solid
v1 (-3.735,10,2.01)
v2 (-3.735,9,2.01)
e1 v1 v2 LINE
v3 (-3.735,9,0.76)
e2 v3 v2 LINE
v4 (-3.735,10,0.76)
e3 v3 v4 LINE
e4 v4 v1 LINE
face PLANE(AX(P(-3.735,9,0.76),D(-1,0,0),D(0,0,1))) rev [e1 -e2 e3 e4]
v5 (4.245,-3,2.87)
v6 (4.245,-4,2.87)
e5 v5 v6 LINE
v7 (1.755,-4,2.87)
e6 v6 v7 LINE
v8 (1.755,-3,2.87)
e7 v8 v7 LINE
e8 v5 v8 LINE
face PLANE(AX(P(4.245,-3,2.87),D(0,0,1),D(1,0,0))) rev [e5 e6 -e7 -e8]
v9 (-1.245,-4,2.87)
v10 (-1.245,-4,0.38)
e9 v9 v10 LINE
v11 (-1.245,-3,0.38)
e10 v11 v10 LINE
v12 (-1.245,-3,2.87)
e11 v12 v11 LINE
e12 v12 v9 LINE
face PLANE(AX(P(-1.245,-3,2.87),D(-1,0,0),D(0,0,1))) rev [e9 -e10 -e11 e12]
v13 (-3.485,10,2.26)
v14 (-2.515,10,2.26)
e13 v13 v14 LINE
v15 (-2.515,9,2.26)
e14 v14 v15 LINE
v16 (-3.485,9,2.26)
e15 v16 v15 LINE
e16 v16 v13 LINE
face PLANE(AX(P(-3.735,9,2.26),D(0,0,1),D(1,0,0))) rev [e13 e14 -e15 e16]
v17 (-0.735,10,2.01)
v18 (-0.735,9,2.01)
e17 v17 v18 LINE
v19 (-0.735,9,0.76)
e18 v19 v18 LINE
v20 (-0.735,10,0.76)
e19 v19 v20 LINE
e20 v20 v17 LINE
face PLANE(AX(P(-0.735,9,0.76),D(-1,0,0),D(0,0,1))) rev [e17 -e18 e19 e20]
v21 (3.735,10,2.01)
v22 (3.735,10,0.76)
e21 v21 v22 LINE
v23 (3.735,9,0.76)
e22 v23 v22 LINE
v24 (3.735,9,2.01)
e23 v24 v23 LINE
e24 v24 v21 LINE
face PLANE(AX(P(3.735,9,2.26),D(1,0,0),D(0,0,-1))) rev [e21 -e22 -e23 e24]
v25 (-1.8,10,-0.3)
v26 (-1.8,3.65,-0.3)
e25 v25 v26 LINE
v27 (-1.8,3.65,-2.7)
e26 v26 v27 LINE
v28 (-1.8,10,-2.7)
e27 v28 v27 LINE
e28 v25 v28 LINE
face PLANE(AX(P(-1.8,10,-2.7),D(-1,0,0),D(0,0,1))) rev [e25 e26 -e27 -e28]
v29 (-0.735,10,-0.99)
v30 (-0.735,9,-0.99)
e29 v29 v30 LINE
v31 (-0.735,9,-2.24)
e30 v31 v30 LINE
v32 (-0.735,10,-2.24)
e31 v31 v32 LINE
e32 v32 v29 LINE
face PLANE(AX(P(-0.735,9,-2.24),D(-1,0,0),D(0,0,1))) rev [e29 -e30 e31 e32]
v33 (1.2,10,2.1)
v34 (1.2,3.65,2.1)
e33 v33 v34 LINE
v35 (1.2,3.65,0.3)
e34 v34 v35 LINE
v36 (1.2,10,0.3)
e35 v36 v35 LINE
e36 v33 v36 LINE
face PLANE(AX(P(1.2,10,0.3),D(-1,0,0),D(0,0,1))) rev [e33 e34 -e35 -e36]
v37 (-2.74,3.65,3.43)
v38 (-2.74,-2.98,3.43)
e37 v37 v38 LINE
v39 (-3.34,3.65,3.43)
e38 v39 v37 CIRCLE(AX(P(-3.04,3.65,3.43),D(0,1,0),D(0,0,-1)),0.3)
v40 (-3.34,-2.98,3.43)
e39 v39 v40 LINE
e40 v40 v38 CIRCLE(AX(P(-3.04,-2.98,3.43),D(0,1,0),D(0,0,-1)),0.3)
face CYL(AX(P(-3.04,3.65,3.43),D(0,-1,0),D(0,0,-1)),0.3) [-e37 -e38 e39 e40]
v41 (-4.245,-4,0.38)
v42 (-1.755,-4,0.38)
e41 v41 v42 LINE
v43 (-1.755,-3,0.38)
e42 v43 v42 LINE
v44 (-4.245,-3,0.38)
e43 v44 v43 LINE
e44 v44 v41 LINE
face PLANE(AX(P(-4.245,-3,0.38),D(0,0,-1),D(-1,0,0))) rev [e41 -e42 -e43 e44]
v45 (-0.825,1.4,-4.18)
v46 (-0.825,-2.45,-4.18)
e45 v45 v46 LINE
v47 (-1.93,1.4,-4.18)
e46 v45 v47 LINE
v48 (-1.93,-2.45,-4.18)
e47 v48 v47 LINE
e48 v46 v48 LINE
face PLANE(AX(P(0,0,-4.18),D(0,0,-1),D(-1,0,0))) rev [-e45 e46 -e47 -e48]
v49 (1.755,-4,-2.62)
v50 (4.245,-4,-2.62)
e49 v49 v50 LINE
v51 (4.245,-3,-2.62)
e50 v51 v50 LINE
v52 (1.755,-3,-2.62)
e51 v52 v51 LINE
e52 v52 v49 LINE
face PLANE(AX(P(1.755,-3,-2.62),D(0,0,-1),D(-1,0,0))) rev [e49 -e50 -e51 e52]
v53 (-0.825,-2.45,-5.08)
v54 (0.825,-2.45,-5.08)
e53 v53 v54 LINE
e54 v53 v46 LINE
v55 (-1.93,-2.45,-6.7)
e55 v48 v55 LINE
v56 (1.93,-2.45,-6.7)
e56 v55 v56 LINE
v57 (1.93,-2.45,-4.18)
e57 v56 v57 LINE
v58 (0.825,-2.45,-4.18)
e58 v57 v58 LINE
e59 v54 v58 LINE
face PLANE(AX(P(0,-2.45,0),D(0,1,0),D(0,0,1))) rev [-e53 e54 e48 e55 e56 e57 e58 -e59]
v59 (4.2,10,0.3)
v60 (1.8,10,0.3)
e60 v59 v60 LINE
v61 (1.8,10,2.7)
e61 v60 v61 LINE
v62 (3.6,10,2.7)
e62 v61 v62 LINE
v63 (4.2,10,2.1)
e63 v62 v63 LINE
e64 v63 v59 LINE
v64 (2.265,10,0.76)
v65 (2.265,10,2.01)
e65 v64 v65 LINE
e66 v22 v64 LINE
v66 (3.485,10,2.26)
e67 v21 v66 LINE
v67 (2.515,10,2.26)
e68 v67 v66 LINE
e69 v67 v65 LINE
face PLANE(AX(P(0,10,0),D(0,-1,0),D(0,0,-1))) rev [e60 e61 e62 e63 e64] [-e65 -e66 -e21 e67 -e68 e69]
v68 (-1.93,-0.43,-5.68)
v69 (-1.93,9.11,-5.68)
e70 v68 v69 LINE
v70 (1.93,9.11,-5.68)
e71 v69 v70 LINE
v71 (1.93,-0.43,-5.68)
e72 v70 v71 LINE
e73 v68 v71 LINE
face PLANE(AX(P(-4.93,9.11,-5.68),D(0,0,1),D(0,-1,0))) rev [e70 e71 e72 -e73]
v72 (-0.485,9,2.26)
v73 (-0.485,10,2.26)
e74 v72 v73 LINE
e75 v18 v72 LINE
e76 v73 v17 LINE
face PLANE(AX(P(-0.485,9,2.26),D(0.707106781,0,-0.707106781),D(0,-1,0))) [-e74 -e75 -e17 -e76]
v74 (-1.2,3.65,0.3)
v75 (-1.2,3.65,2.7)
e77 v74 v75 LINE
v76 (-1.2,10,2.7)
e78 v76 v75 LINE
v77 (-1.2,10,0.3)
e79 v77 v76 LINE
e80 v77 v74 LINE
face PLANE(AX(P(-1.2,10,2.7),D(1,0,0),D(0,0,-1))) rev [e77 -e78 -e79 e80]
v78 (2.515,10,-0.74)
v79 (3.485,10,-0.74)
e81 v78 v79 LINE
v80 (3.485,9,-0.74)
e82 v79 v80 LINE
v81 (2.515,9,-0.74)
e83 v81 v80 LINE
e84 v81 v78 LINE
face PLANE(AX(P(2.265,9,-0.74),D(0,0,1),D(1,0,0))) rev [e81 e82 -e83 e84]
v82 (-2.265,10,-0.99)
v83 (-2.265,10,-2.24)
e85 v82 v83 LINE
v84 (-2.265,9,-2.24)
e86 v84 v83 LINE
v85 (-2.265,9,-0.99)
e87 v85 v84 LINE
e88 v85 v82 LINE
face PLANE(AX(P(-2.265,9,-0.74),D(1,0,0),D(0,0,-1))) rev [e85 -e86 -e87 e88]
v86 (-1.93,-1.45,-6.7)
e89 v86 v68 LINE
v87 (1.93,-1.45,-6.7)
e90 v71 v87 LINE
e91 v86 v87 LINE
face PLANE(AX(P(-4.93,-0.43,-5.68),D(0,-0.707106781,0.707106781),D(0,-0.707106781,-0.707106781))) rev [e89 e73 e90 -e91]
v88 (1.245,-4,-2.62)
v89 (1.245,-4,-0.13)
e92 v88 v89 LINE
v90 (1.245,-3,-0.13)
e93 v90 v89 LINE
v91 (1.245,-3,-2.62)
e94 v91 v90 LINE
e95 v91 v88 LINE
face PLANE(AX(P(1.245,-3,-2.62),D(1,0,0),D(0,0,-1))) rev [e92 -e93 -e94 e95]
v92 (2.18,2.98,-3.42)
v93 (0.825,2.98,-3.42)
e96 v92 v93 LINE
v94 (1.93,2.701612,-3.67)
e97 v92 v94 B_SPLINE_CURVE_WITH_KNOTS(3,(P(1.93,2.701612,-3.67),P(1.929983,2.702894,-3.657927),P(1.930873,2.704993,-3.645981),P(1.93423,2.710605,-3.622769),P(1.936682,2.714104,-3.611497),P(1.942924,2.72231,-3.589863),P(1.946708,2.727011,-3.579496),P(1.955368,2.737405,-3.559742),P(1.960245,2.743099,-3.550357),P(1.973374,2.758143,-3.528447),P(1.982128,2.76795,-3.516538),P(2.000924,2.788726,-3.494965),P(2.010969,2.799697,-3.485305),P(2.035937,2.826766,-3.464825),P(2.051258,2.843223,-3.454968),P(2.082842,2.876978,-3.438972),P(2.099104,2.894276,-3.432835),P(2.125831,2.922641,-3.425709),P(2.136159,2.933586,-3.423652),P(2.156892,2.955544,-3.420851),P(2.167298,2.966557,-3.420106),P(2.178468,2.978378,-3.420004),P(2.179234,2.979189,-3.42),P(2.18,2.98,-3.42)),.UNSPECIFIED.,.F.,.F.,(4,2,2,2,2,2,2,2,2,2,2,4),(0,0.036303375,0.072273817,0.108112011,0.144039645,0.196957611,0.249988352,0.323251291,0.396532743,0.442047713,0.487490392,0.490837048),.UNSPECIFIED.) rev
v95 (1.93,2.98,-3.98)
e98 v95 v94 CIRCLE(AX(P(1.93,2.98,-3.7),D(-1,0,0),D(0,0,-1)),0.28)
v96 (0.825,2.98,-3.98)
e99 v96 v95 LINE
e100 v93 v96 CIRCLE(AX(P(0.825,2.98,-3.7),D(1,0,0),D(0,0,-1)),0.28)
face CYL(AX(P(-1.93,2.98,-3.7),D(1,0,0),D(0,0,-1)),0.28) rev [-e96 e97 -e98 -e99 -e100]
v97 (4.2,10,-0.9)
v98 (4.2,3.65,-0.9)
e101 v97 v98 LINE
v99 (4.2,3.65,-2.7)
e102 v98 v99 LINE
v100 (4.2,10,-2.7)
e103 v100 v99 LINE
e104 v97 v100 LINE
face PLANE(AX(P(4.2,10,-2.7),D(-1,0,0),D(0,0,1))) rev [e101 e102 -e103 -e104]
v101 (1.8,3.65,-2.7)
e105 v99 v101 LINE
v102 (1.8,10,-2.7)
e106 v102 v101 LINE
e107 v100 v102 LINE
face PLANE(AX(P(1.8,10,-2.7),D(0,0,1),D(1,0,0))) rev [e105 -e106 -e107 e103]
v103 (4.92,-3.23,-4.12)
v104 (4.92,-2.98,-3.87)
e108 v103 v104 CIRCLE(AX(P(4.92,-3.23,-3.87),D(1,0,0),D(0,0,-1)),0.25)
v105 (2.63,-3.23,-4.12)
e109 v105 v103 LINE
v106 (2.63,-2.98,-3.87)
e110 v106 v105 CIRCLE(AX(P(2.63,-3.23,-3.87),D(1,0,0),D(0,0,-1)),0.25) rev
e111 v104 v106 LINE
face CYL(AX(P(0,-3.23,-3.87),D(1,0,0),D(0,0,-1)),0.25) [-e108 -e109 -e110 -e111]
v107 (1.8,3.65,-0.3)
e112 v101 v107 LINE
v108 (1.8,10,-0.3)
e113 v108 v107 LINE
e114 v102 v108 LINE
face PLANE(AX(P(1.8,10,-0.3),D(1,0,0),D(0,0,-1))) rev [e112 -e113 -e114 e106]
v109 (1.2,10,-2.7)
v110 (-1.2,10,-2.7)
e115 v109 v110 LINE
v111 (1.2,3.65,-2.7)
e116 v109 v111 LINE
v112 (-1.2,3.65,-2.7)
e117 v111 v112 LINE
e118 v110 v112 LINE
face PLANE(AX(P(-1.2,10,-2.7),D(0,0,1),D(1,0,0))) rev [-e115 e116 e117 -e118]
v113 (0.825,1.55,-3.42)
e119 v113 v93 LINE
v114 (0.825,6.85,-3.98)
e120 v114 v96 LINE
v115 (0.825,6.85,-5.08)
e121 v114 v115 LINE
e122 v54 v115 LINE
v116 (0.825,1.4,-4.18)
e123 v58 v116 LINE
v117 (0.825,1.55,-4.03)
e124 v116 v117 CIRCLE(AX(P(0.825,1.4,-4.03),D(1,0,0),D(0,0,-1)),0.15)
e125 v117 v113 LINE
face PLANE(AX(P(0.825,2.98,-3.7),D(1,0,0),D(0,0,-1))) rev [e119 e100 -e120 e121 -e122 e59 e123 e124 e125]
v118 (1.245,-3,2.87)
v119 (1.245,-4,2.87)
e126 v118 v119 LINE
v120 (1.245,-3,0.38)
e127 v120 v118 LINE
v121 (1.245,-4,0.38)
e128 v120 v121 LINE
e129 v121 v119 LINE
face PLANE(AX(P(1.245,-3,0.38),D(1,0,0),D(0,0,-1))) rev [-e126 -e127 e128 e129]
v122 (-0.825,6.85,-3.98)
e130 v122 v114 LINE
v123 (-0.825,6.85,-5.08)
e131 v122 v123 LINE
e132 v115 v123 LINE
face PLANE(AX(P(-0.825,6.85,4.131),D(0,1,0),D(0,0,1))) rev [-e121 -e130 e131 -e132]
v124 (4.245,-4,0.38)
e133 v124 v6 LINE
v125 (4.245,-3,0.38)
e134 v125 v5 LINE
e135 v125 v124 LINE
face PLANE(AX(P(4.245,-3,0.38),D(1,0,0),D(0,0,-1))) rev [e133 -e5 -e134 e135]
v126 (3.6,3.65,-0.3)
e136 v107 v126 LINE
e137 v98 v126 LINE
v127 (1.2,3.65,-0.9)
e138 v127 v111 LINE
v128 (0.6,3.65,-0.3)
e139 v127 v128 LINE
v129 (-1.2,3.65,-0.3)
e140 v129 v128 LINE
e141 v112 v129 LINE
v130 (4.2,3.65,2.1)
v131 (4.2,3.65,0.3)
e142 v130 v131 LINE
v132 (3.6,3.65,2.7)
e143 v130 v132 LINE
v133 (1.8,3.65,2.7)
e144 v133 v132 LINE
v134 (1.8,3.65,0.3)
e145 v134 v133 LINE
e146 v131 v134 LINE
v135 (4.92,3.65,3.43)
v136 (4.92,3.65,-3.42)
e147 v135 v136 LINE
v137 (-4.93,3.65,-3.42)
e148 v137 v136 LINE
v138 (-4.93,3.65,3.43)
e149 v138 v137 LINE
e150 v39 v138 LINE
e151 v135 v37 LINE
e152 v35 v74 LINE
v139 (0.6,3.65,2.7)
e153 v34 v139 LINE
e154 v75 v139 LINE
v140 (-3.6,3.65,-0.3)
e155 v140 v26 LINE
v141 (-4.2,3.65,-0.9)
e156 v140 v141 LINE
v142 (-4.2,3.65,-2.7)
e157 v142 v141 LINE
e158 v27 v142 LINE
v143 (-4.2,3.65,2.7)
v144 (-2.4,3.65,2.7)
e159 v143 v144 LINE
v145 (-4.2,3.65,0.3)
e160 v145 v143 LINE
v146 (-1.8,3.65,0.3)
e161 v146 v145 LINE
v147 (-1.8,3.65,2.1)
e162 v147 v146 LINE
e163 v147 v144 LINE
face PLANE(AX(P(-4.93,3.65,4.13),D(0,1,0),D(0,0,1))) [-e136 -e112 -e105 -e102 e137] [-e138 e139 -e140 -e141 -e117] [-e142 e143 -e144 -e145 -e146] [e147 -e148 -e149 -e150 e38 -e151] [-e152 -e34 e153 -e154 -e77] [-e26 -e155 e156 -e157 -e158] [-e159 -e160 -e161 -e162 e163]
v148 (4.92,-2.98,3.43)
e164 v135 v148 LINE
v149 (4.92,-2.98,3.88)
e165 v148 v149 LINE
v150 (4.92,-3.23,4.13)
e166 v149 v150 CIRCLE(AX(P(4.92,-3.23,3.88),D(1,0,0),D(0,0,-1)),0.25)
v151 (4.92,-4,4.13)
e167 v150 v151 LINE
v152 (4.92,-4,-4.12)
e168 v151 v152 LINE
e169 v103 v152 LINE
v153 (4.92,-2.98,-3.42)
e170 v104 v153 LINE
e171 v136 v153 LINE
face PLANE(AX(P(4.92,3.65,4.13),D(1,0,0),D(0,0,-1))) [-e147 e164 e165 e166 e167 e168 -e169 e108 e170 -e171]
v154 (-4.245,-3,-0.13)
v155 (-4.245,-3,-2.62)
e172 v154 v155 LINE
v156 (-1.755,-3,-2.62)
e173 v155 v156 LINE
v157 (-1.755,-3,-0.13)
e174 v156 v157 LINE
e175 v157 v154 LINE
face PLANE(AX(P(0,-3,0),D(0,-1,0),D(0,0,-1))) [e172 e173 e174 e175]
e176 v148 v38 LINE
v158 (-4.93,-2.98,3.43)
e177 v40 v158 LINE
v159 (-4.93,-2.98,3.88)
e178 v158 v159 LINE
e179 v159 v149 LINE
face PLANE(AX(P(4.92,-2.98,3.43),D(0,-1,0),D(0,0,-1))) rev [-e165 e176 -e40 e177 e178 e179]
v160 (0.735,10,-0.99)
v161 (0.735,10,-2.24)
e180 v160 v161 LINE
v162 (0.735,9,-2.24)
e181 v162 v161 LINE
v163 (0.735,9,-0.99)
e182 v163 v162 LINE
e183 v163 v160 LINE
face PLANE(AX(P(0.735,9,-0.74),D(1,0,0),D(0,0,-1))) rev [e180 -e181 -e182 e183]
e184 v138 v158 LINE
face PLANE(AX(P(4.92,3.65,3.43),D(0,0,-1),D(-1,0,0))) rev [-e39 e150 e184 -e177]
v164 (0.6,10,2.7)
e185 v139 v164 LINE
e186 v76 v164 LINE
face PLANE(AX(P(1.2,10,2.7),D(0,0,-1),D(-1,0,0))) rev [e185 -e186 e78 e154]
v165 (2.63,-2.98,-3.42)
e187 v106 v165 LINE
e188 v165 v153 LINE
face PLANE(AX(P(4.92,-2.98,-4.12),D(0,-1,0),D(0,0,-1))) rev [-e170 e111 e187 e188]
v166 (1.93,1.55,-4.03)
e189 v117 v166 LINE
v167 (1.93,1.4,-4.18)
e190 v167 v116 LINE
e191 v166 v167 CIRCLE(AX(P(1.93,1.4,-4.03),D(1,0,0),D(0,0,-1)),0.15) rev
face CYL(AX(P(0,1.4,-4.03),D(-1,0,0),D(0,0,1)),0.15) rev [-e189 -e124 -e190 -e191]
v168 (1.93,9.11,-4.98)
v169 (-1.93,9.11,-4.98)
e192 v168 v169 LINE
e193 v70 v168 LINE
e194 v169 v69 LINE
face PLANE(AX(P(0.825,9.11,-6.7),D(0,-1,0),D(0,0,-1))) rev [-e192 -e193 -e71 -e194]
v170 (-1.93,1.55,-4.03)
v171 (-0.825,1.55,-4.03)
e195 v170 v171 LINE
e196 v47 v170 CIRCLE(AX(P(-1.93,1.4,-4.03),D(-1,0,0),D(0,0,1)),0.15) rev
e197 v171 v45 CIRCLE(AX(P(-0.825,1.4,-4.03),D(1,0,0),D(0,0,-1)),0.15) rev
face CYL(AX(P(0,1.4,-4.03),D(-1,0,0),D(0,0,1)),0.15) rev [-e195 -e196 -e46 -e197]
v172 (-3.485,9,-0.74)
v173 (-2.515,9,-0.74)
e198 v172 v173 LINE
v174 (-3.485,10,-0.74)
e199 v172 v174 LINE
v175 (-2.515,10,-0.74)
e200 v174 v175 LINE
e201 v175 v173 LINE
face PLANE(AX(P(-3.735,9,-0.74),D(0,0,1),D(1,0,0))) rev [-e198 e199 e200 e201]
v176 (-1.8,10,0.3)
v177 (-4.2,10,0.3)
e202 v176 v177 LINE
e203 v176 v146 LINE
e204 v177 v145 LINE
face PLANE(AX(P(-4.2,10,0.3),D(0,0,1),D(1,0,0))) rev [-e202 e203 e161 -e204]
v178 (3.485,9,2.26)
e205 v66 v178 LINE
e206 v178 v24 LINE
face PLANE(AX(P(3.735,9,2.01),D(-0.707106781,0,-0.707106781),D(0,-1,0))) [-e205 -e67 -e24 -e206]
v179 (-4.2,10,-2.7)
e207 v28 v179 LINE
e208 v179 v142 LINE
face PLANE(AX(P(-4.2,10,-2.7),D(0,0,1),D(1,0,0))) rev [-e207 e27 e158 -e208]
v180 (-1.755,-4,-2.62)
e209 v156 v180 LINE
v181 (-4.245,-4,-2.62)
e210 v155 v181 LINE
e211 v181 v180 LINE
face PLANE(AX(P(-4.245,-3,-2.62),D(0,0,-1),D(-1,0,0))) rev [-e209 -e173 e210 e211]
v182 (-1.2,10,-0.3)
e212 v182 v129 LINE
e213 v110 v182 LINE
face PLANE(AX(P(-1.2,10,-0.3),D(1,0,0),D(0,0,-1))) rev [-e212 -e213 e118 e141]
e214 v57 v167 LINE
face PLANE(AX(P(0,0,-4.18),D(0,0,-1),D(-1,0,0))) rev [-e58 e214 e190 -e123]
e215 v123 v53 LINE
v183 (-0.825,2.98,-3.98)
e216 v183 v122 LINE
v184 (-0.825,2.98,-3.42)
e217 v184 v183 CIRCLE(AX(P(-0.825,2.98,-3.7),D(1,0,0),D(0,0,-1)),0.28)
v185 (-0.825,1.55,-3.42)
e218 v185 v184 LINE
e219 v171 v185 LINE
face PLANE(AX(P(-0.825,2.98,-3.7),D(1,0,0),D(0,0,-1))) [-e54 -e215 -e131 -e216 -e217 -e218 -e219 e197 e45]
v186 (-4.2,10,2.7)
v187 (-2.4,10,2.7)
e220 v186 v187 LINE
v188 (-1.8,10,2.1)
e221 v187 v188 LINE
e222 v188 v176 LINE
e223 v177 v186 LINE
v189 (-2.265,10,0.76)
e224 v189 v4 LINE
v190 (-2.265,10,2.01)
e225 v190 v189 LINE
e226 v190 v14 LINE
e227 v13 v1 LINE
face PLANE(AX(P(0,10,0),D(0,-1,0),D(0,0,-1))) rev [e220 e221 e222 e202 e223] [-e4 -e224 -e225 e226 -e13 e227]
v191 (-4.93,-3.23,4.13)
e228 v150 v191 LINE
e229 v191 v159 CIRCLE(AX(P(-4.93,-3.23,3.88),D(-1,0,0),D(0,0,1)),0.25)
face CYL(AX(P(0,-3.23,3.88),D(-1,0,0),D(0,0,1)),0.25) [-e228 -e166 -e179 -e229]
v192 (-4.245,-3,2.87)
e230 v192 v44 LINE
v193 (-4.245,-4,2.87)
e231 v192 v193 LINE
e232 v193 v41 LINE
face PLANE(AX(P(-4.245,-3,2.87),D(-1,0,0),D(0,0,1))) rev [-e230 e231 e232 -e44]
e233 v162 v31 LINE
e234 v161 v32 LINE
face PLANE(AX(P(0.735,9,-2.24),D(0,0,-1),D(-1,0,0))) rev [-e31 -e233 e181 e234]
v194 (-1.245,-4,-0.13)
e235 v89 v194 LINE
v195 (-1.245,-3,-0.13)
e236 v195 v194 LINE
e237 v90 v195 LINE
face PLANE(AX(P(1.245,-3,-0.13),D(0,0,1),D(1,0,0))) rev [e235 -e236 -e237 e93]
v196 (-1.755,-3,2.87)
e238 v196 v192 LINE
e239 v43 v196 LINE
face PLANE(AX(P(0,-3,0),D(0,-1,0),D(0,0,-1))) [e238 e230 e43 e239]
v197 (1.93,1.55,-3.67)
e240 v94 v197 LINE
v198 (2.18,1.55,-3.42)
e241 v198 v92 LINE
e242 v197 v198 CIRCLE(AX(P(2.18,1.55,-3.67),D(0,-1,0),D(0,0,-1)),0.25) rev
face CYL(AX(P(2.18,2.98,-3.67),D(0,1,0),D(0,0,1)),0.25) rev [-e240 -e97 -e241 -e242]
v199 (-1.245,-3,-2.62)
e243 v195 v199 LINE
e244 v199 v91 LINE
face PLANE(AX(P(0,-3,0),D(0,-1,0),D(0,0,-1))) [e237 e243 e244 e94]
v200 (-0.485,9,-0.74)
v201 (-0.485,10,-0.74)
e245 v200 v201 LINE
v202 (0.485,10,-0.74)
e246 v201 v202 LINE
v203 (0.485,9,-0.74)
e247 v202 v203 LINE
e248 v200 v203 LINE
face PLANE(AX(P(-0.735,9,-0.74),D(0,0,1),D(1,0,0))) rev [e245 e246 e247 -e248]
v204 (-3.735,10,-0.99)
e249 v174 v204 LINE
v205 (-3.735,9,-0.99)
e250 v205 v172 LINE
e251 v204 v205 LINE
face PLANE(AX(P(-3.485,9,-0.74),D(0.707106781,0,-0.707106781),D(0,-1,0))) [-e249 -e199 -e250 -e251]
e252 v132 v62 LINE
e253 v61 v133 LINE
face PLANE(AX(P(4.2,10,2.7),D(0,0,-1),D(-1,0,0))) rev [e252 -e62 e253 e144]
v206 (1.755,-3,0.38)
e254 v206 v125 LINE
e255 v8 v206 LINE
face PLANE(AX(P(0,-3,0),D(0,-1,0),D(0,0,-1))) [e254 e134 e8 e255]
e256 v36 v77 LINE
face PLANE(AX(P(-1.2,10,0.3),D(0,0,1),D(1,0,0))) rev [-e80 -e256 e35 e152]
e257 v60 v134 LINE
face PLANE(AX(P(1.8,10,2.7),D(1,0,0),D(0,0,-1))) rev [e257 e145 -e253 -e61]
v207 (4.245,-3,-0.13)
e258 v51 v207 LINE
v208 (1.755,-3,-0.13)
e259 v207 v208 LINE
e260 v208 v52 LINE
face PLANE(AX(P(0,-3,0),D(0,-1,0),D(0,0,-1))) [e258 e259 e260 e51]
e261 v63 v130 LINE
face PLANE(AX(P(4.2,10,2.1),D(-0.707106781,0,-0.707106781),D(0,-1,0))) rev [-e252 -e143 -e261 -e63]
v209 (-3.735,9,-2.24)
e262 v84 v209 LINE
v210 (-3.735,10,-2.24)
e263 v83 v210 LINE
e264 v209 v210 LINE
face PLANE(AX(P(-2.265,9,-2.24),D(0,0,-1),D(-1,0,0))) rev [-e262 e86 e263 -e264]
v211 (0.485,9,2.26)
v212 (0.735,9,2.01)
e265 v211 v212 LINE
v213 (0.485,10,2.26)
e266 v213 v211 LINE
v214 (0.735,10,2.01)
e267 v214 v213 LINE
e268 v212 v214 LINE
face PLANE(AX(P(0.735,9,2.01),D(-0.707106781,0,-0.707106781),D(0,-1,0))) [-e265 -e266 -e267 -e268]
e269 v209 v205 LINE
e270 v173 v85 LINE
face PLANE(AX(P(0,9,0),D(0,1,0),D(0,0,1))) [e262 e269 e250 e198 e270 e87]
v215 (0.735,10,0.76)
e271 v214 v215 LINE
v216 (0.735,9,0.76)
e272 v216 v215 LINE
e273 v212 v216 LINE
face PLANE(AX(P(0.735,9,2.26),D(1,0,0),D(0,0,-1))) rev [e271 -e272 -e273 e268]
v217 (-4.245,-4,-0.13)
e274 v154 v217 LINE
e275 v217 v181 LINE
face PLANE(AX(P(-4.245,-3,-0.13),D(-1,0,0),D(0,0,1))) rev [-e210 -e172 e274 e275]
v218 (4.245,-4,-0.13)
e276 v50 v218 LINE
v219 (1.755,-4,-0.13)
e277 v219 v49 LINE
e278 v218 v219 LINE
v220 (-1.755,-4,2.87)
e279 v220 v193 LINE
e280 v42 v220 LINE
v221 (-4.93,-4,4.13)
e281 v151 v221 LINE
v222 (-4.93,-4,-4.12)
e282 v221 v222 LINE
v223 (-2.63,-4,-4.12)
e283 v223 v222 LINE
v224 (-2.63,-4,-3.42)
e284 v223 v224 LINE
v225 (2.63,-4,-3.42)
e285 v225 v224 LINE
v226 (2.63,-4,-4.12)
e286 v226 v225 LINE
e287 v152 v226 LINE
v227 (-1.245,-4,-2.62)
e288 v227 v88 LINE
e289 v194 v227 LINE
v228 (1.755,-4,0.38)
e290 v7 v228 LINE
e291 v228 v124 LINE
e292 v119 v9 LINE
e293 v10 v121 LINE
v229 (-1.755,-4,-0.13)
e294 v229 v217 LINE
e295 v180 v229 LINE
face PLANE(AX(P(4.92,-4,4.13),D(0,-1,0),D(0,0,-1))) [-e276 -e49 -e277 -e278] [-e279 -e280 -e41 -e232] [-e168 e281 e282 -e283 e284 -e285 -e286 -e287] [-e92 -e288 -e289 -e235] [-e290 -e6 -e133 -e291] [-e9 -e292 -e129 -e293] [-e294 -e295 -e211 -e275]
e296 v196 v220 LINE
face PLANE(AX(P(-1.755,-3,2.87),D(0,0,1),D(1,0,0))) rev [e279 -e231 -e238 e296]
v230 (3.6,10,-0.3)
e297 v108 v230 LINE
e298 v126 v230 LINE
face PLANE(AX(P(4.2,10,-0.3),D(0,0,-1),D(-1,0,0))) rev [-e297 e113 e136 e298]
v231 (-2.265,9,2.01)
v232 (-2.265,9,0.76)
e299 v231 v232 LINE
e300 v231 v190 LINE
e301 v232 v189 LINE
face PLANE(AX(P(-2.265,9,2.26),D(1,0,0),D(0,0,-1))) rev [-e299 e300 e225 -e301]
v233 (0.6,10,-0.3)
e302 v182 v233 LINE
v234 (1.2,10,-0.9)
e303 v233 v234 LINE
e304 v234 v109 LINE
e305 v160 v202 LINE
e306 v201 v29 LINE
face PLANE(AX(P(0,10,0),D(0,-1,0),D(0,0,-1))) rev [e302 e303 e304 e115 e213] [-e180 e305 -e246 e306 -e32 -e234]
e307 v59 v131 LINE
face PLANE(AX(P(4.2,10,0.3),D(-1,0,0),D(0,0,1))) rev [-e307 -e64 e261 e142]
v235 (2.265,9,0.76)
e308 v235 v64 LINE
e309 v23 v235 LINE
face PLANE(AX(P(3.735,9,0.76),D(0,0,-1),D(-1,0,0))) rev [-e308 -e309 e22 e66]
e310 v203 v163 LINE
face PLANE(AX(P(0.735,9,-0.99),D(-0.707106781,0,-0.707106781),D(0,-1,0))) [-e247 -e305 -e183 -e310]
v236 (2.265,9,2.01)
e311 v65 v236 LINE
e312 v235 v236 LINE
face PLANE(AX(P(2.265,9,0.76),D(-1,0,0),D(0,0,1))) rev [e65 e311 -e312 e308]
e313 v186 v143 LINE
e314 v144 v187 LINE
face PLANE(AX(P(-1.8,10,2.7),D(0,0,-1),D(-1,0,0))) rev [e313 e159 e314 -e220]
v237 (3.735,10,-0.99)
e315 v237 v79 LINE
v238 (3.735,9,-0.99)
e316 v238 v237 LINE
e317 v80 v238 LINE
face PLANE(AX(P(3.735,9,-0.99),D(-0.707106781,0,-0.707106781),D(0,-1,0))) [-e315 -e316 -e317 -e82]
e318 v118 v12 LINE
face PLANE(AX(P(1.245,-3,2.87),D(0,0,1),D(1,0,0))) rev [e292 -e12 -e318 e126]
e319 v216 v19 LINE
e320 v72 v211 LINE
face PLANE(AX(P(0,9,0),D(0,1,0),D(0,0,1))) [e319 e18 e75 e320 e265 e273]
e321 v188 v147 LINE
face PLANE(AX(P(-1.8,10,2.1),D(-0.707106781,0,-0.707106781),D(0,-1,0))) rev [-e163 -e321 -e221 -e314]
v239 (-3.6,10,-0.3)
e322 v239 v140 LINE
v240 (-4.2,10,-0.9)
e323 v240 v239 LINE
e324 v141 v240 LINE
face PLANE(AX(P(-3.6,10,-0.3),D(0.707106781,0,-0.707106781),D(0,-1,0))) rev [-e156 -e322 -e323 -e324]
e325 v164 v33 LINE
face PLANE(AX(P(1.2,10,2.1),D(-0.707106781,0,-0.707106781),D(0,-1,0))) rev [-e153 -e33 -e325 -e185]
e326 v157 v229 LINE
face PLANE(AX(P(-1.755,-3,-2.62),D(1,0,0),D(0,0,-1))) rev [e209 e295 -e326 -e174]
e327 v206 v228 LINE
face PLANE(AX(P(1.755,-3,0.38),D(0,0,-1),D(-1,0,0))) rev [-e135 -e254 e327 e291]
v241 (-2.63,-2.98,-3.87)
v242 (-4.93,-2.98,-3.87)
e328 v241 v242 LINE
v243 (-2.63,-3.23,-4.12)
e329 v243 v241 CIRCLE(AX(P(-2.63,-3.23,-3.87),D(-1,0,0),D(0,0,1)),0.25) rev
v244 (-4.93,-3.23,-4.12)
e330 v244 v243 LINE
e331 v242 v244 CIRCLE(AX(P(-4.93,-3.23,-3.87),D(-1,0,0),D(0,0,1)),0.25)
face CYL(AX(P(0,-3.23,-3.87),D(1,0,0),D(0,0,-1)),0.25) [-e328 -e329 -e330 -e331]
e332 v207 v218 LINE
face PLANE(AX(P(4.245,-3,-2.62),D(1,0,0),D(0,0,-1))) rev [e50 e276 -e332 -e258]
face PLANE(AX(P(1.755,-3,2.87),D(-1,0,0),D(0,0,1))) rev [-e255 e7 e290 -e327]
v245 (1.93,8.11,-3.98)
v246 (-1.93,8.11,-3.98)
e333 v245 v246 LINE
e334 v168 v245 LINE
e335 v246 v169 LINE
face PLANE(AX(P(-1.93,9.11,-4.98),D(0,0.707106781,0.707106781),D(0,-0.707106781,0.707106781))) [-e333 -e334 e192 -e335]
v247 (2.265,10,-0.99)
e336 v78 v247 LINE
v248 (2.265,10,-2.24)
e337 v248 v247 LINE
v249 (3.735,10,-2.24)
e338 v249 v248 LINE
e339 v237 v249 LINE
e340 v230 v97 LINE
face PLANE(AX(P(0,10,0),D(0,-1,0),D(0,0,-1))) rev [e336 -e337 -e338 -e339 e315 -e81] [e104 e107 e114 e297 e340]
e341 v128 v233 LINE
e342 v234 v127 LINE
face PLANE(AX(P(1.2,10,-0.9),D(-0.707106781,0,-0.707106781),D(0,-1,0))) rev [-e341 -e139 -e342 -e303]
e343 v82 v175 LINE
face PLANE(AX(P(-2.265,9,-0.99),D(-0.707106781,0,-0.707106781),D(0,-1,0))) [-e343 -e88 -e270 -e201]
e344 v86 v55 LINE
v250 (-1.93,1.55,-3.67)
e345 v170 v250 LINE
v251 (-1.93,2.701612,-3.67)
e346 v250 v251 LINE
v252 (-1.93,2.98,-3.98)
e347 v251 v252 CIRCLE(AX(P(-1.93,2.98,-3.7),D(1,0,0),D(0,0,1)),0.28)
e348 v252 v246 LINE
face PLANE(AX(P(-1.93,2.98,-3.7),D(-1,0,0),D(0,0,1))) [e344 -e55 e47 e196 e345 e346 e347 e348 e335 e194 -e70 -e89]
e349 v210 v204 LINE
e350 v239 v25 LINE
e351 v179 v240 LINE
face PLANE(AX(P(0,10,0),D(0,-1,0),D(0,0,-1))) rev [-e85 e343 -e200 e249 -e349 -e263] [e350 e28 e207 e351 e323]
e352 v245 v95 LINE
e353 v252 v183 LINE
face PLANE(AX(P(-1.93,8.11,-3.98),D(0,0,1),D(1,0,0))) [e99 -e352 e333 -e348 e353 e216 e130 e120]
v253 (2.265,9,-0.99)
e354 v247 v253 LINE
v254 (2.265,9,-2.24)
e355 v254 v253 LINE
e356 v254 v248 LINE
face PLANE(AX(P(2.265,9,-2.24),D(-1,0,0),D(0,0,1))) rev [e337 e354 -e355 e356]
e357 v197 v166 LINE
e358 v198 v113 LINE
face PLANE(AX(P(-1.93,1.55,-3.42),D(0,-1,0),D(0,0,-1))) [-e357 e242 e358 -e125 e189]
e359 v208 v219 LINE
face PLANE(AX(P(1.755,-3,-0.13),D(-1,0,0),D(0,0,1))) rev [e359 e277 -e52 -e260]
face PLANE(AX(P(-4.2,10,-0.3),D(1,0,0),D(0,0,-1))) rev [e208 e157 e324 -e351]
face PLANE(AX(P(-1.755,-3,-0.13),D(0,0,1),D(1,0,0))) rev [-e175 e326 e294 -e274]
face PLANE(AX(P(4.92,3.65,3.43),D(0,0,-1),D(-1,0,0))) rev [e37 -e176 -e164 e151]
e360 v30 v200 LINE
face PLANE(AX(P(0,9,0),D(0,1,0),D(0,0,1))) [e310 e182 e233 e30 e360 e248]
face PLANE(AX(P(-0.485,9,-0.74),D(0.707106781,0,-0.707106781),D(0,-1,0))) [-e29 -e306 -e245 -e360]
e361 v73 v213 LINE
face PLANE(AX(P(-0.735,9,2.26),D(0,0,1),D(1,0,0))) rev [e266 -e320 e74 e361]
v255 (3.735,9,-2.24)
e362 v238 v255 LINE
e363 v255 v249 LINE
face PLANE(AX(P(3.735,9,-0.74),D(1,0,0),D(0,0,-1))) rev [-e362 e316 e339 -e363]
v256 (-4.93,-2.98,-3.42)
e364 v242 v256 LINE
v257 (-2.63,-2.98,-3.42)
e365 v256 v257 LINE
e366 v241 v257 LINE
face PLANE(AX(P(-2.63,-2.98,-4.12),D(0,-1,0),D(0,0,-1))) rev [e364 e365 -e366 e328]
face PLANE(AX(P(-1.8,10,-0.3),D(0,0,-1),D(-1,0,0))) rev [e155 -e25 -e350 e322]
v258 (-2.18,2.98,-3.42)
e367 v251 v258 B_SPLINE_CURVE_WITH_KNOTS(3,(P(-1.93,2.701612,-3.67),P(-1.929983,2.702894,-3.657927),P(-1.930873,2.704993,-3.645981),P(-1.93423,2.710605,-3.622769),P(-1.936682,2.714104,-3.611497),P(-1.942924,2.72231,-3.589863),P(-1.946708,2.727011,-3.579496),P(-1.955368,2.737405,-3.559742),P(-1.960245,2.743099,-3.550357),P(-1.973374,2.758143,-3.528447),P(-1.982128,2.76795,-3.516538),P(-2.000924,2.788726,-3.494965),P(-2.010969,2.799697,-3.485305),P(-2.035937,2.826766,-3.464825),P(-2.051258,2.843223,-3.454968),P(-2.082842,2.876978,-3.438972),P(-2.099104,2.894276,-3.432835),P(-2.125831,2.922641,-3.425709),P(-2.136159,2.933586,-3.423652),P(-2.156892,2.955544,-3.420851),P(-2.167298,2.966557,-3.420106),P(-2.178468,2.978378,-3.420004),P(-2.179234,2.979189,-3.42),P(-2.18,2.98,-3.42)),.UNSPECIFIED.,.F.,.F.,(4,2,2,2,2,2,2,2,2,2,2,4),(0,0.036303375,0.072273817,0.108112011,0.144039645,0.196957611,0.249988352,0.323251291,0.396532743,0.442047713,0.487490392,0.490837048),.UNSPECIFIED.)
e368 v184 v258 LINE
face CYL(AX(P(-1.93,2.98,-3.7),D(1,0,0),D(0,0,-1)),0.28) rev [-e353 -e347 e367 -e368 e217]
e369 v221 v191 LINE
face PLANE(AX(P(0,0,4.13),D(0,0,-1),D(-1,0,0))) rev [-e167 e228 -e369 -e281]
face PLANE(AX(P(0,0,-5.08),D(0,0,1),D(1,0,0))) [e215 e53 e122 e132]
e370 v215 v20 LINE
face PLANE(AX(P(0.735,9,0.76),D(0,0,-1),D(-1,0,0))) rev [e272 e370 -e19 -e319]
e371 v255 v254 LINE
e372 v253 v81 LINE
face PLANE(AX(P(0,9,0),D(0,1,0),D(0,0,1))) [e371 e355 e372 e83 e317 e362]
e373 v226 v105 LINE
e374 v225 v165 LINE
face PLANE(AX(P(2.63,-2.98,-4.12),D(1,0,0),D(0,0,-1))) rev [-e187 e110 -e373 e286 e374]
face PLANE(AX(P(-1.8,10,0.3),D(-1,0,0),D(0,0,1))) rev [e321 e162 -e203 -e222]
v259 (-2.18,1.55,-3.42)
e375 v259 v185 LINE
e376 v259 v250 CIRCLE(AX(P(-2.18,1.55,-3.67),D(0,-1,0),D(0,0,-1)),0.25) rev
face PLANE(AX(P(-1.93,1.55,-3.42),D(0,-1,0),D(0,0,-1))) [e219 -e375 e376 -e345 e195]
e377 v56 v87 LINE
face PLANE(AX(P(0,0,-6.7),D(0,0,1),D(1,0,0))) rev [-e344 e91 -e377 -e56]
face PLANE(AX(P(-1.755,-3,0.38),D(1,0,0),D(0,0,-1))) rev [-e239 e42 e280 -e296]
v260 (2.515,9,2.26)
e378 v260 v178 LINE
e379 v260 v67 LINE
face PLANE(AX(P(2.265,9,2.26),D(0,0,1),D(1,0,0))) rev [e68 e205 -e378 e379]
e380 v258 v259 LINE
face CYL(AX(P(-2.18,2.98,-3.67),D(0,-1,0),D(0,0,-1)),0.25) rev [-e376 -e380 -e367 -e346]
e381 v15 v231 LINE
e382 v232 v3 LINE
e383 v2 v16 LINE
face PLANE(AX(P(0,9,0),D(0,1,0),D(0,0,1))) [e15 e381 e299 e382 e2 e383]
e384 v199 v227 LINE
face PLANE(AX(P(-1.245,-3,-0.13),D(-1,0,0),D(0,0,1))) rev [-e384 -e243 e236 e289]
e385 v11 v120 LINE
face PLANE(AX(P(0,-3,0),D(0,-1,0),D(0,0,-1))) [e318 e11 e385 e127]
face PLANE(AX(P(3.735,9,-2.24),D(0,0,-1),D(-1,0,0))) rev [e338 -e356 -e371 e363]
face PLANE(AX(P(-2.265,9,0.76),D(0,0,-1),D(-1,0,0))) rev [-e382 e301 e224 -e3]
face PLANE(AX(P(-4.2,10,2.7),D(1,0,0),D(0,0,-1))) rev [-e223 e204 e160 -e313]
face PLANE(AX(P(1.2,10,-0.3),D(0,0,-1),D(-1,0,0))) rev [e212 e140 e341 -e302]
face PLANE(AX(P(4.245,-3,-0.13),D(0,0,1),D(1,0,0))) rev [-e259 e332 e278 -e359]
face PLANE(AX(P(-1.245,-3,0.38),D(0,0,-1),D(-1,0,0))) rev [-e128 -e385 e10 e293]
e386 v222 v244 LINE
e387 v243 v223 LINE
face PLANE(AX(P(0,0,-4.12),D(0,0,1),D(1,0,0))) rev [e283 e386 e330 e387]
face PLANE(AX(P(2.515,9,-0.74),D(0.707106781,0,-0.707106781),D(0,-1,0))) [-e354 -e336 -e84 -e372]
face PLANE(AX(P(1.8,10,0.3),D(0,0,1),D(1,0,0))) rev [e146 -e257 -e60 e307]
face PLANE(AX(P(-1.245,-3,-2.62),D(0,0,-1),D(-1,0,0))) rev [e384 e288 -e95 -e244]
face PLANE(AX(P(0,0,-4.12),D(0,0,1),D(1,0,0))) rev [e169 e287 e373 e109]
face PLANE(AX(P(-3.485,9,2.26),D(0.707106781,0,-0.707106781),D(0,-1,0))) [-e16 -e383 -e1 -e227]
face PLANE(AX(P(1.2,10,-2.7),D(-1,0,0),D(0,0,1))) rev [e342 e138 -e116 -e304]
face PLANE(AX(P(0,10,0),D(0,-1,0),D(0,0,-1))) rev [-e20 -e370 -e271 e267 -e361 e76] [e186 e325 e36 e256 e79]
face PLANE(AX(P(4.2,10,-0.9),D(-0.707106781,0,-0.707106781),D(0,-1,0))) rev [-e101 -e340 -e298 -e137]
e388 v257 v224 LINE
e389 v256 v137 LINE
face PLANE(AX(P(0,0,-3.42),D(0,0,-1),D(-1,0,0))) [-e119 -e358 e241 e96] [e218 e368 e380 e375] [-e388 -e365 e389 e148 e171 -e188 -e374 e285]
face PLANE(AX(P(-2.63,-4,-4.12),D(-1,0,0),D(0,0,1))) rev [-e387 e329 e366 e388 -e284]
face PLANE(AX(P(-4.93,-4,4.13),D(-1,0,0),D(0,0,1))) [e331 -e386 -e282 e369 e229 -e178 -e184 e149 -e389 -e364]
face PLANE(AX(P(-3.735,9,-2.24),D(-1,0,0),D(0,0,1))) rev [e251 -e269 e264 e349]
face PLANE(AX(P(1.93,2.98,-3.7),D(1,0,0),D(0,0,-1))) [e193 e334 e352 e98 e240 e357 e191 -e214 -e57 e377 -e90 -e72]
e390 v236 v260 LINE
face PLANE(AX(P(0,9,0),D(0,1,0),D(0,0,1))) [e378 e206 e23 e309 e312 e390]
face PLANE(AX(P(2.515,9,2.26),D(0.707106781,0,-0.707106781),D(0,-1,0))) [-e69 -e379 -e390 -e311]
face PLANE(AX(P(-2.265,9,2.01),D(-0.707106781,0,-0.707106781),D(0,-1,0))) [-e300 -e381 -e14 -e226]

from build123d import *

# Parameters (mm, degrees)
BOSS_EXTRUDE1_START  = -0.825
BOSS_EXTRUDE1_DEPTH  = 1.65
BOSS_EXTRUDE2_START  = 1.105
BOSS_EXTRUDE2_DEPTH  = 1.105
BOSS_EXTRUDE3_DEPTH  = 1.105
CUT_EXTRUDE1_DEPTH   = 1.65
SKETCH5_W            = 9.85
SKETCH5_H            = 7.65
BOSS_EXTRUDE4_DEPTH  = 7.55
CUT_EXTRUDE2_REACH   = 15.28
SKETCH6_W            = 1.65
SKETCH6_H            = 5.3
SKETCH7_W            = 3.86
SKETCH7_H            = 2.52
BOSS_EXTRUDE5_DEPTH  = 4
SKETCH8_W            = 1.65
SKETCH8_H            = 9.3
CUT_EXTRUDE3_DEPTH   = 0.9
SKETCH9_W            = 0.7
SKETCH9_H            = 6.63
CUT_EXTRUDE4_DEPTH   = 15.996819663
BOSS_EXTRUDE6_DEPTH  = 6.63
CUT_EXTRUDE5_DEPTH   = 14.226552839
SKETCH12_W           = 2.4
SKETCH12_H           = 2.4
BOSS_EXTRUDE7_DEPTH  = 6.35
SKETCH13_W           = 1.47
SKETCH13_H           = 1.5
CUT_EXTRUDE6_DEPTH   = 1
SKETCH14_W           = 2.4
SKETCH14_H           = 2.4
BOSS_EXTRUDE8_DEPTH  = 6.35
SKETCH15_W           = 1.47
SKETCH15_H           = 1.5
CUT_EXTRUDE7_DEPTH   = 1
SKETCH16_W           = 2.4
SKETCH16_H           = 2.4
BOSS_EXTRUDE9_DEPTH  = 6.35
SKETCH17_W           = 1.47
SKETCH17_H           = 1.5
CUT_EXTRUDE8_DEPTH   = 1
SKETCH18_W           = 2.4
SKETCH18_H           = 2.4
BOSS_EXTRUDE10_DEPTH = 6.35
SKETCH19_W           = 1.47
SKETCH19_H           = 1.5
CUT_EXTRUDE9_DEPTH   = 1
SKETCH20_W           = 2.4
SKETCH20_H           = 2.4
BOSS_EXTRUDE11_DEPTH = 6.35
SKETCH21_W           = 1.47
SKETCH21_H           = 1.5
CUT_EXTRUDE10_DEPTH  = 1
SKETCH22_W           = 2.4
SKETCH22_H           = 2.4
BOSS_EXTRUDE12_DEPTH = 6.35
SKETCH23_W           = 1.47
SKETCH23_H           = 1.5
CUT_EXTRUDE11_DEPTH  = 1
SKETCH24_W           = 2.49
SKETCH24_H           = 2.49
CUT_EXTRUDE12_DEPTH  = 1
SKETCH25_W           = 2.49
SKETCH25_H           = 2.49
CUT_EXTRUDE13_DEPTH  = 1
SKETCH26_W           = 2.49
SKETCH26_H           = 2.49
CUT_EXTRUDE14_DEPTH  = 1
SKETCH27_W           = 2.49
SKETCH27_H           = 2.49
CUT_EXTRUDE15_DEPTH  = 1
SKETCH28_W           = 2.49
SKETCH28_H           = 2.49
CUT_EXTRUDE16_DEPTH  = 1
SKETCH29_W           = 2.29
SKETCH29_H           = 1.02
BOSS_EXTRUDE13_DEPTH = 0.7
SKETCH30_W           = 2.3
SKETCH30_H           = 1.02
BOSS_EXTRUDE14_DEPTH = 0.7
SKETCH31_W           = 2.49
SKETCH31_H           = 2.49
CUT_EXTRUDE17_DEPTH  = 1
CHAMFER1_SIZE        = 0.6
CHAMFER2_SIZE        = 0.25
FILLET1_R            = 0.25
FILLET2_R            = 0.15


with BuildPart() as part:
    # Boss-Extrude1: read off the stored shape, not the designer's step
    # Boss-Extrude1 outline → Boss-Extrude1 (new body)
    with BuildSketch(Plane.YZ.offset(BOSS_EXTRUDE1_START)):
        with BuildLine():
            Line((2.98, -3.42), (1.55, -3.42))
            Line((1.55, -3.42), (1.55, -6.7))
            Line((1.55, -6.7), (9.11, -6.7))
            Line((9.11, -6.7), (9.11, -4.98))
            Line((9.11, -4.98), (8.11, -3.98))
            Line((8.11, -3.98), (2.98, -3.98))
            ThreePointArc((2.98, -3.98), (2.7, -3.7), (2.98, -3.42))
        make_face()
    extrude(amount=BOSS_EXTRUDE1_DEPTH)

    # Sketch2 → Boss-Extrude2 (add)
    with BuildSketch(Plane.ZY.offset(0.825).offset(BOSS_EXTRUDE2_START)):
        with BuildLine():
            Line((-6.7, 1.55), (-6.7, 9.11))
            Line((-6.7, 9.11), (-4.98, 9.11))
            Line((-4.98, 9.11), (-3.98, 8.11))
            Line((-3.98, 8.11), (-3.98, 2.98))
            ThreePointArc((-3.98, 2.98), (-3.7, 2.7), (-3.42, 2.98))
            Line((-3.42, 2.98), (-3.42, 1.55))
            Line((-3.42, 1.55), (-6.7, 1.55))
        make_face()
    extrude(amount=-BOSS_EXTRUDE2_DEPTH)

    # Sketch3 → Boss-Extrude3 (add)
    with BuildSketch(Plane(origin=(0.825, 0, 0), x_dir=(0, 0, -1), z_dir=(1, 0, 0))):
        with BuildLine():
            Line((6.7, 1.55), (3.42, 1.55))
            Line((3.42, 1.55), (3.42, 2.98))
            ThreePointArc((3.42, 2.98), (3.7, 2.7), (3.98, 2.98))
            Line((3.98, 2.98), (3.98, 8.11))
            Line((3.98, 8.11), (4.98, 9.11))
            Line((4.98, 9.11), (6.7, 9.11))
            Line((6.7, 9.11), (6.7, 1.55))
        make_face()
    extrude(amount=BOSS_EXTRUDE3_DEPTH)

    # Sketch4 → Cut-Extrude1 (cut)
    with BuildSketch(Plane(origin=(-0.825, 0, 0), x_dir=(0, -1, 0), z_dir=(-1, 0, 0))):
        with BuildLine():
            Line((-2.98, -3.98), (-1.55, -3.98))
            Line((-1.55, -3.98), (-1.55, -3.42))
            Line((-1.55, -3.42), (-2.98, -3.42))
            ThreePointArc((-2.98, -3.42), (-2.7, -3.7), (-2.98, -3.98))
        make_face()
    extrude(amount=-CUT_EXTRUDE1_DEPTH, mode=Mode.SUBTRACT)

    # Sketch5 → Boss-Extrude4 (add)
    with BuildSketch(Plane(origin=(0, 0, -3.42), x_dir=(-1, 0, 0), z_dir=(0, 0, -1))):
        with Locations((0.005, -0.175)):
            Rectangle(SKETCH5_W, SKETCH5_H)
    extrude(amount=-BOSS_EXTRUDE4_DEPTH)

    # Sketch6 → Cut-Extrude2 (cut, up to next)
    with BuildSketch(Plane(origin=(0, 0, -4.18), x_dir=(-1, 0, 0), z_dir=(0, 0, -1)), mode=Mode.PRIVATE) as cut_extrude2_sk1:
        with Locations((0, 4.2)):
            Rectangle(SKETCH6_W, SKETCH6_H)
    cut_extrude2_tool1 = extrude(cut_extrude2_sk1.sketch, amount=-CUT_EXTRUDE2_REACH, mode=Mode.PRIVATE) & part.part
    add(cut_extrude2_tool1.solids().sort_by_distance((0, 4.2, -4.18))[0], mode=Mode.SUBTRACT)

    # Sketch7 → Boss-Extrude5 (add)
    with BuildSketch(Plane.XZ.offset(-1.55)):
        with Locations((0, -5.44)):
            Rectangle(SKETCH7_W, SKETCH7_H)
    extrude(amount=BOSS_EXTRUDE5_DEPTH)

    # Sketch8 → Cut-Extrude3 (cut)
    with BuildSketch(Plane.XY.offset(-4.18)):
        with Locations((0, 2.2)):
            Rectangle(SKETCH8_W, SKETCH8_H)
    extrude(amount=-CUT_EXTRUDE3_DEPTH, mode=Mode.SUBTRACT)

    # Sketch9 → Cut-Extrude4 (cut, through all)
    with BuildSketch(Plane.ZY.offset(4.93)):
        with Locations((3.78, 0.335)):
            Rectangle(SKETCH9_W, SKETCH9_H)
    extrude(amount=-CUT_EXTRUDE4_DEPTH, mode=Mode.SUBTRACT)

    # Sketch10 → Boss-Extrude6 (add)
    with BuildSketch(Plane(origin=(0, -2.98, 0), x_dir=(-1, 0, 0), z_dir=(0, 1, 0))):
        with BuildLine():
            Line((3.34, 3.43), (2.74, 3.43))
            ThreePointArc((2.74, 3.43), (3.04, 3.73), (3.34, 3.43))
        make_face()
    extrude(amount=BOSS_EXTRUDE6_DEPTH)

    # Sketch11 → Cut-Extrude5 (cut, through all)
    with BuildSketch(Plane(origin=(1.93, 0, 0), x_dir=(0, 0, -1), z_dir=(1, 0, 0))):
        Polygon((5.68, -0.43), (6.7, -1.45), (6.7, 9.11), (5.68, 9.11), align=None)
    extrude(amount=-CUT_EXTRUDE5_DEPTH, mode=Mode.SUBTRACT)

    # Sketch12 → Boss-Extrude7 (add)
    with BuildSketch(Plane(origin=(0, 3.65, 0), x_dir=(-1, 0, 0), z_dir=(0, 1, 0))):
        with Locations((3, 1.5)):
            Rectangle(SKETCH12_W, SKETCH12_H)
    extrude(amount=BOSS_EXTRUDE7_DEPTH)

    # Sketch13 → Cut-Extrude6 (cut)
    with BuildSketch(Plane(origin=(0, 10, 0), x_dir=(-1, 0, 0), z_dir=(0, 1, 0))):
        with Locations((3, 1.51)):
            Rectangle(SKETCH13_W, SKETCH13_H)
    extrude(amount=-CUT_EXTRUDE6_DEPTH, mode=Mode.SUBTRACT)

    # Sketch14 → Boss-Extrude8 (add)
    with BuildSketch(Plane(origin=(0, 3.65, 0), x_dir=(-1, 0, 0), z_dir=(0, 1, 0))):
        with Locations((0, 1.5)):
            Rectangle(SKETCH14_W, SKETCH14_H)
    extrude(amount=BOSS_EXTRUDE8_DEPTH)

    # Sketch15 → Cut-Extrude7 (cut)
    with BuildSketch(Plane(origin=(0, 10, 0), x_dir=(-1, 0, 0), z_dir=(0, 1, 0))):
        with Locations((0, 1.51)):
            Rectangle(SKETCH15_W, SKETCH15_H)
    extrude(amount=-CUT_EXTRUDE7_DEPTH, mode=Mode.SUBTRACT)

    # Sketch16 → Boss-Extrude9 (add)
    with BuildSketch(Plane(origin=(0, 3.65, 0), x_dir=(-1, 0, 0), z_dir=(0, 1, 0))):
        with Locations((0, -1.5)):
            Rectangle(SKETCH16_W, SKETCH16_H)
    extrude(amount=BOSS_EXTRUDE9_DEPTH)

    # Sketch17 → Cut-Extrude8 (cut)
    with BuildSketch(Plane(origin=(0, 10, 0), x_dir=(-1, 0, 0), z_dir=(0, 1, 0))):
        with Locations((0, -1.49)):
            Rectangle(SKETCH17_W, SKETCH17_H)
    extrude(amount=-CUT_EXTRUDE8_DEPTH, mode=Mode.SUBTRACT)

    # Sketch18 → Boss-Extrude10 (add)
    with BuildSketch(Plane(origin=(0, 3.65, 0), x_dir=(-1, 0, 0), z_dir=(0, 1, 0))):
        with Locations((-3, 1.5)):
            Rectangle(SKETCH18_W, SKETCH18_H)
    extrude(amount=BOSS_EXTRUDE10_DEPTH)

    # Sketch19 → Cut-Extrude9 (cut)
    with BuildSketch(Plane(origin=(0, 10, 0), x_dir=(-1, 0, 0), z_dir=(0, 1, 0))):
        with Locations((-3, 1.51)):
            Rectangle(SKETCH19_W, SKETCH19_H)
    extrude(amount=-CUT_EXTRUDE9_DEPTH, mode=Mode.SUBTRACT)

    # Sketch20 → Boss-Extrude11 (add)
    with BuildSketch(Plane(origin=(0, 3.65, 0), x_dir=(-1, 0, 0), z_dir=(0, 1, 0))):
        with Locations((-3, -1.5)):
            Rectangle(SKETCH20_W, SKETCH20_H)
    extrude(amount=BOSS_EXTRUDE11_DEPTH)

    # Sketch21 → Cut-Extrude10 (cut)
    with BuildSketch(Plane(origin=(0, 10, 0), x_dir=(-1, 0, 0), z_dir=(0, 1, 0))):
        with Locations((-3, -1.49)):
            Rectangle(SKETCH21_W, SKETCH21_H)
    extrude(amount=-CUT_EXTRUDE10_DEPTH, mode=Mode.SUBTRACT)

    # Sketch22 → Boss-Extrude12 (add)
    with BuildSketch(Plane(origin=(0, 3.65, 0), x_dir=(-1, 0, 0), z_dir=(0, 1, 0))):
        with Locations((3, -1.5)):
            Rectangle(SKETCH22_W, SKETCH22_H)
    extrude(amount=BOSS_EXTRUDE12_DEPTH)

    # Sketch23 → Cut-Extrude11 (cut)
    with BuildSketch(Plane(origin=(0, 10, 0), x_dir=(-1, 0, 0), z_dir=(0, 1, 0))):
        with Locations((3, -1.49)):
            Rectangle(SKETCH23_W, SKETCH23_H)
    extrude(amount=-CUT_EXTRUDE11_DEPTH, mode=Mode.SUBTRACT)

    # Sketch24 → Cut-Extrude12 (cut)
    with BuildSketch(Plane.XZ.offset(4)):
        with Locations((-3, -1.375)):
            Rectangle(SKETCH24_W, SKETCH24_H)
    extrude(amount=-CUT_EXTRUDE12_DEPTH, mode=Mode.SUBTRACT)

    # Sketch25 → Cut-Extrude13 (cut)
    with BuildSketch(Plane.XZ.offset(4)):
        with Locations((-3, 1.625)):
            Rectangle(SKETCH25_W, SKETCH25_H)
    extrude(amount=-CUT_EXTRUDE13_DEPTH, mode=Mode.SUBTRACT)

    # Sketch26 → Cut-Extrude14 (cut)
    with BuildSketch(Plane.XZ.offset(4)):
        with Locations((0, -1.375)):
            Rectangle(SKETCH26_W, SKETCH26_H)
    extrude(amount=-CUT_EXTRUDE14_DEPTH, mode=Mode.SUBTRACT)

    # Sketch27 → Cut-Extrude15 (cut)
    with BuildSketch(Plane.XZ.offset(4)):
        with Locations((0, 1.625)):
            Rectangle(SKETCH27_W, SKETCH27_H)
    extrude(amount=-CUT_EXTRUDE15_DEPTH, mode=Mode.SUBTRACT)

    # Sketch28 → Cut-Extrude16 (cut)
    with BuildSketch(Plane.XZ.offset(4)):
        with Locations((3, -1.375)):
            Rectangle(SKETCH28_W, SKETCH28_H)
    extrude(amount=-CUT_EXTRUDE16_DEPTH, mode=Mode.SUBTRACT)

    # Sketch29 → Boss-Extrude13 (add)
    with BuildSketch(Plane(origin=(0, 0, -3.42), x_dir=(-1, 0, 0), z_dir=(0, 0, -1))):
        with Locations((-3.775, -3.49)):
            Rectangle(SKETCH29_W, SKETCH29_H)
    extrude(amount=BOSS_EXTRUDE13_DEPTH)

    # Sketch30 → Boss-Extrude14 (add)
    with BuildSketch(Plane(origin=(0, 0, -3.42), x_dir=(-1, 0, 0), z_dir=(0, 0, -1))):
        with Locations((3.78, -3.49)):
            Rectangle(SKETCH30_W, SKETCH30_H)
    extrude(amount=BOSS_EXTRUDE14_DEPTH)

    # Sketch31 → Cut-Extrude17 (cut)
    with BuildSketch(Plane.XZ.offset(4)):
        with Locations((3, 1.625)):
            Rectangle(SKETCH31_W, SKETCH31_H)
    extrude(amount=-CUT_EXTRUDE17_DEPTH, mode=Mode.SUBTRACT)

    # Chamfer1
    chamfer1_edges = [part.edges().sort_by_distance(p)[0] for p in [
        (-1.8, 6.825, 2.7),
        (1.2, 6.825, 2.7),
        (1.2, 6.825, -0.3),
        (4.2, 6.825, 2.7),
        (4.2, 6.825, -0.3),
        (-4.2, 6.825, -0.3),
    ]]
    chamfer(chamfer1_edges, length=CHAMFER1_SIZE)

    # Chamfer2
    chamfer2_edges = [part.edges().sort_by_distance(p)[0] for p in [
        (-2.265, 9.5, 2.26),
        (-3.735, 9.5, 2.26),
        (0.735, 9.5, 2.26),
        (-0.735, 9.5, 2.26),
        (0.735, 9.5, -0.74),
        (-0.735, 9.5, -0.74),
        (3.735, 9.5, 2.26),
        (2.265, 9.5, 2.26),
        (3.735, 9.5, -0.74),
        (2.265, 9.5, -0.74),
        (-2.265, 9.5, -0.74),
        (-3.735, 9.5, -0.74),
    ]]
    chamfer(chamfer2_edges, length=CHAMFER2_SIZE)

    # Fillet1
    fillet1_edges = [part.edges().sort_by_distance(p)[0] for p in [
        (-1.93, 2.265, -3.42),
        (1.93, 2.265, -3.42),
        (-0.005, -2.98, 4.13),
        (3.775, -2.98, -4.12),
        (-3.78, -2.98, -4.12),
    ]]
    fillet(fillet1_edges, radius=FILLET1_R - 0.0001)  # a hair under: the kernel refuses the full size

    # Fillet2
    fillet2_edges = [part.edges().sort_by_distance(p)[0] for p in [
        (1.3775, 1.55, -4.18),
        (-1.3775, 1.55, -4.18),
    ]]
    fillet(fillet2_edges, radius=FILLET2_R)


solid = part.part
